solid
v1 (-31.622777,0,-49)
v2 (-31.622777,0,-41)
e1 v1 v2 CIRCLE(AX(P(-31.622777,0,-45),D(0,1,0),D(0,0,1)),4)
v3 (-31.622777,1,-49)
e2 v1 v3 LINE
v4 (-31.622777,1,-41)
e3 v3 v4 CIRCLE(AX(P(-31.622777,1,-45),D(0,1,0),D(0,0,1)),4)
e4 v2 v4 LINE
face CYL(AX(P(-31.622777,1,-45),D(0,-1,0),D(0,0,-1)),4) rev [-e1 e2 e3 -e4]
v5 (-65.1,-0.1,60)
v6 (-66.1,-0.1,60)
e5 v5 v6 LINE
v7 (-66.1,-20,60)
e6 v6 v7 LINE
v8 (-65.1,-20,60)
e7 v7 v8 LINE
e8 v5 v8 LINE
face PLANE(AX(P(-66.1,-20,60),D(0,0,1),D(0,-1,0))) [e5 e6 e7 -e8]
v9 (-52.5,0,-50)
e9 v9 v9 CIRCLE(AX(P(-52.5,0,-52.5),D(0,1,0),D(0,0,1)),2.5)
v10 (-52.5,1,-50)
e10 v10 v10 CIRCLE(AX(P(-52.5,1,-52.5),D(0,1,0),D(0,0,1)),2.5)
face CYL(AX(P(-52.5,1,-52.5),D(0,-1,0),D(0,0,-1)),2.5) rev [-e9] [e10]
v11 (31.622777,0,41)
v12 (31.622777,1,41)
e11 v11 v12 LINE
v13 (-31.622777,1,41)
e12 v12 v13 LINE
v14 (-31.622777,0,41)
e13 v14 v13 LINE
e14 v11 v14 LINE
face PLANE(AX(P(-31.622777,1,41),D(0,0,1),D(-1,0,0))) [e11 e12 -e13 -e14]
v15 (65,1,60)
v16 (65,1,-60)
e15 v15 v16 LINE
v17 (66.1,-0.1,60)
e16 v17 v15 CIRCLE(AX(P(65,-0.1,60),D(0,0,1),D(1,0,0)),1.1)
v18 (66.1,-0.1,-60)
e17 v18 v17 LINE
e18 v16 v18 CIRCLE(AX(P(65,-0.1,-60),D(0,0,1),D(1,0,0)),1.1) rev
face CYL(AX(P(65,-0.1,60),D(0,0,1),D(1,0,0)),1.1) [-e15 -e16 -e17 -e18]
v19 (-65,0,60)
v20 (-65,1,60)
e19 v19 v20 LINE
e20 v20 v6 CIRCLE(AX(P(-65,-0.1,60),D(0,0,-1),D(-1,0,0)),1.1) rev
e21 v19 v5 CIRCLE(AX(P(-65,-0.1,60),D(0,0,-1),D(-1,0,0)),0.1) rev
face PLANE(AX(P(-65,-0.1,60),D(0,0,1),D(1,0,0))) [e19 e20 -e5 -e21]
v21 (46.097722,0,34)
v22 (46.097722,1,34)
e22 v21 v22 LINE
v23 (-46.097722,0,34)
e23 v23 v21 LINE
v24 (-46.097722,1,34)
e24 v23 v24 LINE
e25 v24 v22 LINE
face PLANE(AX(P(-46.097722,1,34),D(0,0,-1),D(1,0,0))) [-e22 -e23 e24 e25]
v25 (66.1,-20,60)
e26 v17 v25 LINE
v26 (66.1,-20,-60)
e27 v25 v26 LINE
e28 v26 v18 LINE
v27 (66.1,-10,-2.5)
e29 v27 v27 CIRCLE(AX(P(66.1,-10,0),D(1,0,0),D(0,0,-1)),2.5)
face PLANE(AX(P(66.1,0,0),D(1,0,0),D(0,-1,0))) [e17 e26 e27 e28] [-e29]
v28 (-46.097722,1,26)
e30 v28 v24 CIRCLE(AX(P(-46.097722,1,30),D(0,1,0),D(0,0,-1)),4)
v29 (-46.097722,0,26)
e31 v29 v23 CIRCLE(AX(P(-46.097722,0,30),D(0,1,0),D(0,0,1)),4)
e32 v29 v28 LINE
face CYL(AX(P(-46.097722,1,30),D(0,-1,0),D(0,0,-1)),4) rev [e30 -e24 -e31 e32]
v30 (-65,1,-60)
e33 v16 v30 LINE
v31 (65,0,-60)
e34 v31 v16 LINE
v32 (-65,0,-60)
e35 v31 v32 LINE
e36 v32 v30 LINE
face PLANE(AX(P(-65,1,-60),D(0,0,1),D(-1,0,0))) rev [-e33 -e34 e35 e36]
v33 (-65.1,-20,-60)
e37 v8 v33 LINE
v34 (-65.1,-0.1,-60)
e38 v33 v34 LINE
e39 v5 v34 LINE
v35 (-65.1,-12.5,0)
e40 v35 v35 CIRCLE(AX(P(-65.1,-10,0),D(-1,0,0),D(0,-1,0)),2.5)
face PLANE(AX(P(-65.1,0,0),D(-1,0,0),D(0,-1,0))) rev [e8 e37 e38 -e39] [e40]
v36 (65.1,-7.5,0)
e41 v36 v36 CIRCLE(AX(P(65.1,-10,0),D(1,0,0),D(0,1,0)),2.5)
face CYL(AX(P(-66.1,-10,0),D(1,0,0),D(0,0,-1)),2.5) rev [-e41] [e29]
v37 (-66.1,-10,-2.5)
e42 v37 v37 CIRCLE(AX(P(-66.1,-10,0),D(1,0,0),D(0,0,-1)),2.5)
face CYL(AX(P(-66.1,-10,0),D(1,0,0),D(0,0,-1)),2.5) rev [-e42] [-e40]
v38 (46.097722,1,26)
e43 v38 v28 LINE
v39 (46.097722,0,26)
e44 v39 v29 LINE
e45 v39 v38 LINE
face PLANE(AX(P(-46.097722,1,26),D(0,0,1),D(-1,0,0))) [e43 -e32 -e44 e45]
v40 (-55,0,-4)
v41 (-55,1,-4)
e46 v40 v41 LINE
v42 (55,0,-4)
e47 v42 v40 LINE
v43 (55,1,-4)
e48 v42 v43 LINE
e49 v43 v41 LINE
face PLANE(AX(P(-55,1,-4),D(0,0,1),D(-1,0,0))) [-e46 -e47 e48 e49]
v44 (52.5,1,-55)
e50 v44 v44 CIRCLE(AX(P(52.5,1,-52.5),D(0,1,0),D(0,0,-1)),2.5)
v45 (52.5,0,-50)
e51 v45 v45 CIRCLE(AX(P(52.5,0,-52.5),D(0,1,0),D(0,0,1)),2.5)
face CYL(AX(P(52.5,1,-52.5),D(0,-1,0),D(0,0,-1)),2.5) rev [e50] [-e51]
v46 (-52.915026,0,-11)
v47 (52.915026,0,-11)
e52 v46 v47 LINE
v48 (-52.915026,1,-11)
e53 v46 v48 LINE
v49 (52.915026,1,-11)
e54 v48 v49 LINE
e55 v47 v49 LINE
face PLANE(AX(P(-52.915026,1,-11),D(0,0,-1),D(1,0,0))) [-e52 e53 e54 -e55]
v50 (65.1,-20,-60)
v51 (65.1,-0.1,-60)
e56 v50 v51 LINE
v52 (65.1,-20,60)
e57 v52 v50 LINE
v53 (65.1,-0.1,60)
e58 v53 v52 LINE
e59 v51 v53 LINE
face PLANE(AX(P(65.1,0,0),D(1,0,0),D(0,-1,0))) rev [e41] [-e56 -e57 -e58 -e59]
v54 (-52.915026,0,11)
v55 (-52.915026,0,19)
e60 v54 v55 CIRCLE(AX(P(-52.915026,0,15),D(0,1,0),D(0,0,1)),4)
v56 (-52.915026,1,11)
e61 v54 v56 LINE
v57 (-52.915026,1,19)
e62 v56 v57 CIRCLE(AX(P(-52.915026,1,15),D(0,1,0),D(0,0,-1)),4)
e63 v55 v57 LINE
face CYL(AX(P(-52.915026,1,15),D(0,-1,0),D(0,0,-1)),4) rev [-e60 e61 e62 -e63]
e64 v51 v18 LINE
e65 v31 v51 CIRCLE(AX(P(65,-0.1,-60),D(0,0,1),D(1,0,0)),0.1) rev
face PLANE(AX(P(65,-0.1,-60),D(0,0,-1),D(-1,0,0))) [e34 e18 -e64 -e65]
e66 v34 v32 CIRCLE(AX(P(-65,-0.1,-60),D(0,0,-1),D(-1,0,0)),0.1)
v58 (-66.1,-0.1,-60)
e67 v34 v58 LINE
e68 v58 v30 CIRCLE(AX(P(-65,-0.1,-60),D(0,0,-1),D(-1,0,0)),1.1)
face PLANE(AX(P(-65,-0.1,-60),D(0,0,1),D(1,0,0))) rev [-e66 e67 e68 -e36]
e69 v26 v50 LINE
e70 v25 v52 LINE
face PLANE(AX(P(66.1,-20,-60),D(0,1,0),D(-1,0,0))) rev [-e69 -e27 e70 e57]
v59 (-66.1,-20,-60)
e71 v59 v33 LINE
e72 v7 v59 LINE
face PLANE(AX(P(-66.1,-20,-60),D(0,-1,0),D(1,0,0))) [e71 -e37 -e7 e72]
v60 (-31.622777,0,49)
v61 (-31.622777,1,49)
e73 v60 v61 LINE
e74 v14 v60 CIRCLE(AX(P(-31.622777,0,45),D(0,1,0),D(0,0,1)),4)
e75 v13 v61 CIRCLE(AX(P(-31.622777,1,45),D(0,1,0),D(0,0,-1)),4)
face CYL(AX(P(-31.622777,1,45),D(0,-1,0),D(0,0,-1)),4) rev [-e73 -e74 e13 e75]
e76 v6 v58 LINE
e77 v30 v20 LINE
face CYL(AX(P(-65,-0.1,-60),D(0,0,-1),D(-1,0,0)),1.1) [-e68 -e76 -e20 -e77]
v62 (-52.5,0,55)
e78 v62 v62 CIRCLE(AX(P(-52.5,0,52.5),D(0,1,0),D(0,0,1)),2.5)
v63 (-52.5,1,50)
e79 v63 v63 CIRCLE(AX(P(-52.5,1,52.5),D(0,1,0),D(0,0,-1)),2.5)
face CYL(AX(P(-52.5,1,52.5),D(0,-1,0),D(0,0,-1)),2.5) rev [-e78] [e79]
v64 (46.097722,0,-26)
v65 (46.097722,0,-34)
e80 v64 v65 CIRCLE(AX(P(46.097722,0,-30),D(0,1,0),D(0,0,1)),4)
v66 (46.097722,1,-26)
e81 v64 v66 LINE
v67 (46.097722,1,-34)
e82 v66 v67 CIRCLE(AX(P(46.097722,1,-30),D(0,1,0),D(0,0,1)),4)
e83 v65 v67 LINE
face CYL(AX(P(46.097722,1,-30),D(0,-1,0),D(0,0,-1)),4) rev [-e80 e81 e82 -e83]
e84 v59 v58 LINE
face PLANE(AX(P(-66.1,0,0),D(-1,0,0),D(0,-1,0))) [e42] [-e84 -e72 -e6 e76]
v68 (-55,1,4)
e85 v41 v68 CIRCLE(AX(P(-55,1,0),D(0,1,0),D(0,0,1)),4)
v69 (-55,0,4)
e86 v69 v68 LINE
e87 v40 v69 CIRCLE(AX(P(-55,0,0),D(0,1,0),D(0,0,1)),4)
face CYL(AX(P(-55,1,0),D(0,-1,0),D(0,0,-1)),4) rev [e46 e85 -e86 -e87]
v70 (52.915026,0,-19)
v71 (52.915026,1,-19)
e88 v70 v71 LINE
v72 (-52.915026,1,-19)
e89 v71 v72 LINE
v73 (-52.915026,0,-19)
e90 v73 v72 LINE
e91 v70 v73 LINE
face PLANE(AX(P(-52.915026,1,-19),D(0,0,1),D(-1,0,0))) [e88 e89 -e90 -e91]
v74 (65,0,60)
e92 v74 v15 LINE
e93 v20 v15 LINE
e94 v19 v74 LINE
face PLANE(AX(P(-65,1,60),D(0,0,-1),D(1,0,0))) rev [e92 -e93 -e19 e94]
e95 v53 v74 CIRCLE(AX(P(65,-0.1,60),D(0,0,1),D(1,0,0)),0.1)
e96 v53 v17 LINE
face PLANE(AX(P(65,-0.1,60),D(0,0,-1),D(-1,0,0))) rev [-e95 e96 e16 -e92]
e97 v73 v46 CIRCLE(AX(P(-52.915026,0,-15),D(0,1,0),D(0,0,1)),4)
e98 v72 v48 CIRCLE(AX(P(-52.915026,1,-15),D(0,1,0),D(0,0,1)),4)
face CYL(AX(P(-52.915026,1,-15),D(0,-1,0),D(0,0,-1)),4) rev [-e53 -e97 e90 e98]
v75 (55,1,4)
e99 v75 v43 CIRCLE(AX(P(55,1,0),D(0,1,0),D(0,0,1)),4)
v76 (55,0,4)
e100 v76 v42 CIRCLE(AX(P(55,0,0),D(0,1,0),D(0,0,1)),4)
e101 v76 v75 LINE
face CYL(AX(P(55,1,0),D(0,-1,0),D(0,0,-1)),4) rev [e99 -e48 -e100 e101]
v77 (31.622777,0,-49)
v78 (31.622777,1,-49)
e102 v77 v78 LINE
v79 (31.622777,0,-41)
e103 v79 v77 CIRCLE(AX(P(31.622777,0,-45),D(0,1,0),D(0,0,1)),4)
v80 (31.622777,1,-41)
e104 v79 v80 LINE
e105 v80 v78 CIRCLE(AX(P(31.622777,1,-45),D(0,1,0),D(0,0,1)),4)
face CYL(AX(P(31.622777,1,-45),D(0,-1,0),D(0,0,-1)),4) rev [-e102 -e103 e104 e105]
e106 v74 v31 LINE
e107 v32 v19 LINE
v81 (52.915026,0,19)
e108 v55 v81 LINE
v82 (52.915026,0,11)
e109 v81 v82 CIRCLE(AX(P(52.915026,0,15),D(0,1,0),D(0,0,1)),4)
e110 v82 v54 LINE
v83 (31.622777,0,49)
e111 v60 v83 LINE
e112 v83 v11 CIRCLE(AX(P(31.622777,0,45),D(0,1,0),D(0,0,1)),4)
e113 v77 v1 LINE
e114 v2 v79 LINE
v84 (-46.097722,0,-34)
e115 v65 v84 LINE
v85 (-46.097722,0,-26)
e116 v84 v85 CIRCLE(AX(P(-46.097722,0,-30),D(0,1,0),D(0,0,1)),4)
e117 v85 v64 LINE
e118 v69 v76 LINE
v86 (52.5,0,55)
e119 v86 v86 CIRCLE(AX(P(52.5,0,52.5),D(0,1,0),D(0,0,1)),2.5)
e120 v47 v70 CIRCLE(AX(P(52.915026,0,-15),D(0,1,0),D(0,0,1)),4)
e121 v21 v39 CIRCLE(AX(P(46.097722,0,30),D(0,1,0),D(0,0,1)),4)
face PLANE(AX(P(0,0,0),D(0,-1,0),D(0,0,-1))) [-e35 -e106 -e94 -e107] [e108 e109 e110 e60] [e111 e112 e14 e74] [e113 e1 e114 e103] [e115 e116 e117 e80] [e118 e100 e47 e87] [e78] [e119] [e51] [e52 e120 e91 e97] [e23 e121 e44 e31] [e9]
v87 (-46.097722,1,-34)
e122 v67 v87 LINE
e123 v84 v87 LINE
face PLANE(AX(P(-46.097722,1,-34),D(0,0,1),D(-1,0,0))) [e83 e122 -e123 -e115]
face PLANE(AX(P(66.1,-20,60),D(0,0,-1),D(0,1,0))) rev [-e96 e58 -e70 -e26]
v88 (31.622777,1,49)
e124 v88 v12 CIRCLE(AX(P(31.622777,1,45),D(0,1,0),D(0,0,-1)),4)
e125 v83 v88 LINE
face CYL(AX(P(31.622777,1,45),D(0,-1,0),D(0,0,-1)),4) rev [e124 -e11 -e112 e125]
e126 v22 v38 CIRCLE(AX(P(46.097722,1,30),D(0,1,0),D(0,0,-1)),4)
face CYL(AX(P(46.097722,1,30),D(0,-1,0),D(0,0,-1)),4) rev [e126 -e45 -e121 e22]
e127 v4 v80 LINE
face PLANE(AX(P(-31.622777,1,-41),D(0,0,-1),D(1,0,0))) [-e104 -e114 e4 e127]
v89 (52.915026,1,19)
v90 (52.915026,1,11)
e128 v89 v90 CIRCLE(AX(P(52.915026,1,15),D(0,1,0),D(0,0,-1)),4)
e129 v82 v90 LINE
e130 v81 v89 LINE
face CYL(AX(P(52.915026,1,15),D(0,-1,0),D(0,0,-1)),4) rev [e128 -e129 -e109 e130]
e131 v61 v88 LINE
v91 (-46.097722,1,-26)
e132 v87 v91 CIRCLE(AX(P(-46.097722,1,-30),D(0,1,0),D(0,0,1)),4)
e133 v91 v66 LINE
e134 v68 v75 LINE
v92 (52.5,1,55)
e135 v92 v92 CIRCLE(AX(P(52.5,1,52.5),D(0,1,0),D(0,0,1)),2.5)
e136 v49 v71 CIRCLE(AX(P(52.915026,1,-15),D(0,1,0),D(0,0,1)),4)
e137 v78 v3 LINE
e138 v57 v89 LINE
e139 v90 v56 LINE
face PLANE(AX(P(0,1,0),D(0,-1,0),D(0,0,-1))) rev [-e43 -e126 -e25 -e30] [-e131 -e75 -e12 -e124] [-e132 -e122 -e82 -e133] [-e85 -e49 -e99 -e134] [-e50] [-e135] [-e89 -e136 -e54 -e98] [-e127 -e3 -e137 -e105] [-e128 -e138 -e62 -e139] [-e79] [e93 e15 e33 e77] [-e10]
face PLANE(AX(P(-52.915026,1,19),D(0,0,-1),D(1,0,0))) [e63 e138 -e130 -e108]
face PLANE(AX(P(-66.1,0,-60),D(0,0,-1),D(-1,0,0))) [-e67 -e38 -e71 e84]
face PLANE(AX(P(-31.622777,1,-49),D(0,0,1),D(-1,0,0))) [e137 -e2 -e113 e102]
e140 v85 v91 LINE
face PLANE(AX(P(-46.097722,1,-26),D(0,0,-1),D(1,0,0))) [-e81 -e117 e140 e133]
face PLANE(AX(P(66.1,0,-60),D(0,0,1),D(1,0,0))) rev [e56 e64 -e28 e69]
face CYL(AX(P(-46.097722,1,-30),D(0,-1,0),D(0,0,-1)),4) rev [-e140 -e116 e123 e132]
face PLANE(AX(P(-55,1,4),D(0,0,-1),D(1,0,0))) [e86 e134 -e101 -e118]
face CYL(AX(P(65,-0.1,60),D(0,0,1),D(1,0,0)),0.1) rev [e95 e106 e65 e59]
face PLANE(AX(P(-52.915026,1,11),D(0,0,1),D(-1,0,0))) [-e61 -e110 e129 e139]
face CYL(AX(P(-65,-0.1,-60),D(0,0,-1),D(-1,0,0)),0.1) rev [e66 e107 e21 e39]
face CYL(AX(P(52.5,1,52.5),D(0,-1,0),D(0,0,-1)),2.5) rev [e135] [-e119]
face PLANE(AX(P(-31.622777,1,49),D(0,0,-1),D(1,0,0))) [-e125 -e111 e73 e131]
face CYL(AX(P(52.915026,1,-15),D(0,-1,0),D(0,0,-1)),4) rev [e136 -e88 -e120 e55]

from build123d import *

# Parameters (mm, degrees)
SKETCH1_W               = 130
SKETCH1_H               = 120
SKETCH1_R               = 2.5
BOSS_EXTRUDE1_DEPTH     = 1
EDGE_FLANGE1_DEPTH      = 120
CUT_EXTRUDE1_DEPTH      = 92.48338647
CUT_EXTRUDE1_DEPTH_BACK = 92.48338647
SKETCH10_R              = 2.5


# Sheet-metal steps are written as plain solids
with BuildPart() as part:
    # Sketch1 → Boss-Extrude1 (new body)
    with BuildSketch(Plane(origin=(0, 0, 0), x_dir=(1, 0, 0), z_dir=(0, 1, 0))):
        Rectangle(SKETCH1_W, SKETCH1_H)
        with Locations(Location((-52.5, 52.5, 0), (0, 0, 270))):
            Circle(SKETCH1_R, mode=Mode.SUBTRACT)
        with Locations(Location((52.5, 52.5, 0), (0, 0, 90))):
            Circle(SKETCH1_R, mode=Mode.SUBTRACT)
        with Locations(Location((52.5, -52.5, 0), (0, 0, 270))):
            Circle(SKETCH1_R, mode=Mode.SUBTRACT)
        with Locations(Location((-52.5, -52.5, 0), (0, 0, 90))):
            Circle(SKETCH1_R, mode=Mode.SUBTRACT)
        with BuildLine():
            Line((-31.622776602, 49), (31.622776602, 49))
            ThreePointArc((31.622776602, 49), (35.622776602, 45), (31.622776602, 41))
            Line((31.622776602, 41), (-31.622776602, 41))
            ThreePointArc((-31.622776602, 41), (-35.622776602, 45), (-31.622776602, 49))
        make_face(mode=Mode.SUBTRACT)
        with BuildLine():
            Line((-46.097722286, 34), (46.097722286, 34))
            ThreePointArc((46.097722286, 34), (50.097722286, 30), (46.097722286, 26))
            Line((46.097722286, 26), (-46.097722286, 26))
            ThreePointArc((-46.097722286, 26), (-50.097722286, 30), (-46.097722286, 34))
        make_face(mode=Mode.SUBTRACT)
        with BuildLine():
            Line((-52.915026221, 19), (52.915026221, 19))
            ThreePointArc((52.915026221, 19), (56.915026221, 15), (52.915026221, 11))
            Line((52.915026221, 11), (-52.915026221, 11))
            ThreePointArc((-52.915026221, 11), (-56.915026221, 15), (-52.915026221, 19))
        make_face(mode=Mode.SUBTRACT)
        with BuildLine():
            Line((-55, 4), (55, 4))
            ThreePointArc((55, 4), (59, 0), (55, -4))
            Line((55, -4), (-55, -4))
            ThreePointArc((-55, -4), (-59, 0), (-55, 4))
        make_face(mode=Mode.SUBTRACT)
        with BuildLine():
            Line((-52.915026221, -19), (52.915026221, -19))
            ThreePointArc((52.915026221, -19), (56.915026221, -15), (52.915026221, -11))
            Line((52.915026221, -11), (-52.915026221, -11))
            ThreePointArc((-52.915026221, -11), (-56.915026221, -15), (-52.915026221, -19))
        make_face(mode=Mode.SUBTRACT)
        with BuildLine():
            Line((-46.097722286, -34), (46.097722286, -34))
            ThreePointArc((46.097722286, -34), (50.097722286, -30), (46.097722286, -26))
            Line((46.097722286, -26), (-46.097722286, -26))
            ThreePointArc((-46.097722286, -26), (-50.097722286, -30), (-46.097722286, -34))
        make_face(mode=Mode.SUBTRACT)
        with BuildLine():
            Line((-31.622776602, -49), (31.622776602, -49))
            ThreePointArc((31.622776602, -49), (35.622776602, -45), (31.622776602, -41))
            Line((31.622776602, -41), (-31.622776602, -41))
            ThreePointArc((-31.622776602, -41), (-35.622776602, -45), (-31.622776602, -49))
        make_face(mode=Mode.SUBTRACT)
    extrude(amount=BOSS_EXTRUDE1_DEPTH)

    # Edge-Flange1 section (across the edge) → Edge-Flange1 (add)
    with BuildSketch(Plane(origin=(-65.1, 0, 60), x_dir=(1, 0, 0), z_dir=(0, 0, -1))):
        with BuildLine():
            Line((-1, 0.1), (-1, 20))
            Line((-1, 20), (0, 20))
            Line((0, 20), (0, 0.1))
            ThreePointArc((0, 0.1), (0.029289322, 0.029289322), (0.1, 0))
            Line((0.1, 0), (0.1, -1))
            ThreePointArc((0.1, -1), (-0.677817459, -0.677817459), (-1, 0.1))
        make_face()
    edge_flange1 = extrude(amount=EDGE_FLANGE1_DEPTH)

    # Mirror1: Edge-Flange1 across plane
    add(edge_flange1.mirror(Plane(origin=(0, 0, 0), x_dir=(0, 0, 1), z_dir=(1, 0, 0))))

    # Sketch10 → Cut-Extrude1 (cut, two sides: drawn at the far end of the back side and taken through both)
    with BuildSketch(Plane(origin=(0, 0, 0), x_dir=(0, 0, -1), z_dir=(1, 0, 0)).offset(-CUT_EXTRUDE1_DEPTH_BACK)):
        with Locations((0, -10)):
            Circle(SKETCH10_R)
    extrude(amount=CUT_EXTRUDE1_DEPTH + CUT_EXTRUDE1_DEPTH_BACK, mode=Mode.SUBTRACT)


solid = part.part
